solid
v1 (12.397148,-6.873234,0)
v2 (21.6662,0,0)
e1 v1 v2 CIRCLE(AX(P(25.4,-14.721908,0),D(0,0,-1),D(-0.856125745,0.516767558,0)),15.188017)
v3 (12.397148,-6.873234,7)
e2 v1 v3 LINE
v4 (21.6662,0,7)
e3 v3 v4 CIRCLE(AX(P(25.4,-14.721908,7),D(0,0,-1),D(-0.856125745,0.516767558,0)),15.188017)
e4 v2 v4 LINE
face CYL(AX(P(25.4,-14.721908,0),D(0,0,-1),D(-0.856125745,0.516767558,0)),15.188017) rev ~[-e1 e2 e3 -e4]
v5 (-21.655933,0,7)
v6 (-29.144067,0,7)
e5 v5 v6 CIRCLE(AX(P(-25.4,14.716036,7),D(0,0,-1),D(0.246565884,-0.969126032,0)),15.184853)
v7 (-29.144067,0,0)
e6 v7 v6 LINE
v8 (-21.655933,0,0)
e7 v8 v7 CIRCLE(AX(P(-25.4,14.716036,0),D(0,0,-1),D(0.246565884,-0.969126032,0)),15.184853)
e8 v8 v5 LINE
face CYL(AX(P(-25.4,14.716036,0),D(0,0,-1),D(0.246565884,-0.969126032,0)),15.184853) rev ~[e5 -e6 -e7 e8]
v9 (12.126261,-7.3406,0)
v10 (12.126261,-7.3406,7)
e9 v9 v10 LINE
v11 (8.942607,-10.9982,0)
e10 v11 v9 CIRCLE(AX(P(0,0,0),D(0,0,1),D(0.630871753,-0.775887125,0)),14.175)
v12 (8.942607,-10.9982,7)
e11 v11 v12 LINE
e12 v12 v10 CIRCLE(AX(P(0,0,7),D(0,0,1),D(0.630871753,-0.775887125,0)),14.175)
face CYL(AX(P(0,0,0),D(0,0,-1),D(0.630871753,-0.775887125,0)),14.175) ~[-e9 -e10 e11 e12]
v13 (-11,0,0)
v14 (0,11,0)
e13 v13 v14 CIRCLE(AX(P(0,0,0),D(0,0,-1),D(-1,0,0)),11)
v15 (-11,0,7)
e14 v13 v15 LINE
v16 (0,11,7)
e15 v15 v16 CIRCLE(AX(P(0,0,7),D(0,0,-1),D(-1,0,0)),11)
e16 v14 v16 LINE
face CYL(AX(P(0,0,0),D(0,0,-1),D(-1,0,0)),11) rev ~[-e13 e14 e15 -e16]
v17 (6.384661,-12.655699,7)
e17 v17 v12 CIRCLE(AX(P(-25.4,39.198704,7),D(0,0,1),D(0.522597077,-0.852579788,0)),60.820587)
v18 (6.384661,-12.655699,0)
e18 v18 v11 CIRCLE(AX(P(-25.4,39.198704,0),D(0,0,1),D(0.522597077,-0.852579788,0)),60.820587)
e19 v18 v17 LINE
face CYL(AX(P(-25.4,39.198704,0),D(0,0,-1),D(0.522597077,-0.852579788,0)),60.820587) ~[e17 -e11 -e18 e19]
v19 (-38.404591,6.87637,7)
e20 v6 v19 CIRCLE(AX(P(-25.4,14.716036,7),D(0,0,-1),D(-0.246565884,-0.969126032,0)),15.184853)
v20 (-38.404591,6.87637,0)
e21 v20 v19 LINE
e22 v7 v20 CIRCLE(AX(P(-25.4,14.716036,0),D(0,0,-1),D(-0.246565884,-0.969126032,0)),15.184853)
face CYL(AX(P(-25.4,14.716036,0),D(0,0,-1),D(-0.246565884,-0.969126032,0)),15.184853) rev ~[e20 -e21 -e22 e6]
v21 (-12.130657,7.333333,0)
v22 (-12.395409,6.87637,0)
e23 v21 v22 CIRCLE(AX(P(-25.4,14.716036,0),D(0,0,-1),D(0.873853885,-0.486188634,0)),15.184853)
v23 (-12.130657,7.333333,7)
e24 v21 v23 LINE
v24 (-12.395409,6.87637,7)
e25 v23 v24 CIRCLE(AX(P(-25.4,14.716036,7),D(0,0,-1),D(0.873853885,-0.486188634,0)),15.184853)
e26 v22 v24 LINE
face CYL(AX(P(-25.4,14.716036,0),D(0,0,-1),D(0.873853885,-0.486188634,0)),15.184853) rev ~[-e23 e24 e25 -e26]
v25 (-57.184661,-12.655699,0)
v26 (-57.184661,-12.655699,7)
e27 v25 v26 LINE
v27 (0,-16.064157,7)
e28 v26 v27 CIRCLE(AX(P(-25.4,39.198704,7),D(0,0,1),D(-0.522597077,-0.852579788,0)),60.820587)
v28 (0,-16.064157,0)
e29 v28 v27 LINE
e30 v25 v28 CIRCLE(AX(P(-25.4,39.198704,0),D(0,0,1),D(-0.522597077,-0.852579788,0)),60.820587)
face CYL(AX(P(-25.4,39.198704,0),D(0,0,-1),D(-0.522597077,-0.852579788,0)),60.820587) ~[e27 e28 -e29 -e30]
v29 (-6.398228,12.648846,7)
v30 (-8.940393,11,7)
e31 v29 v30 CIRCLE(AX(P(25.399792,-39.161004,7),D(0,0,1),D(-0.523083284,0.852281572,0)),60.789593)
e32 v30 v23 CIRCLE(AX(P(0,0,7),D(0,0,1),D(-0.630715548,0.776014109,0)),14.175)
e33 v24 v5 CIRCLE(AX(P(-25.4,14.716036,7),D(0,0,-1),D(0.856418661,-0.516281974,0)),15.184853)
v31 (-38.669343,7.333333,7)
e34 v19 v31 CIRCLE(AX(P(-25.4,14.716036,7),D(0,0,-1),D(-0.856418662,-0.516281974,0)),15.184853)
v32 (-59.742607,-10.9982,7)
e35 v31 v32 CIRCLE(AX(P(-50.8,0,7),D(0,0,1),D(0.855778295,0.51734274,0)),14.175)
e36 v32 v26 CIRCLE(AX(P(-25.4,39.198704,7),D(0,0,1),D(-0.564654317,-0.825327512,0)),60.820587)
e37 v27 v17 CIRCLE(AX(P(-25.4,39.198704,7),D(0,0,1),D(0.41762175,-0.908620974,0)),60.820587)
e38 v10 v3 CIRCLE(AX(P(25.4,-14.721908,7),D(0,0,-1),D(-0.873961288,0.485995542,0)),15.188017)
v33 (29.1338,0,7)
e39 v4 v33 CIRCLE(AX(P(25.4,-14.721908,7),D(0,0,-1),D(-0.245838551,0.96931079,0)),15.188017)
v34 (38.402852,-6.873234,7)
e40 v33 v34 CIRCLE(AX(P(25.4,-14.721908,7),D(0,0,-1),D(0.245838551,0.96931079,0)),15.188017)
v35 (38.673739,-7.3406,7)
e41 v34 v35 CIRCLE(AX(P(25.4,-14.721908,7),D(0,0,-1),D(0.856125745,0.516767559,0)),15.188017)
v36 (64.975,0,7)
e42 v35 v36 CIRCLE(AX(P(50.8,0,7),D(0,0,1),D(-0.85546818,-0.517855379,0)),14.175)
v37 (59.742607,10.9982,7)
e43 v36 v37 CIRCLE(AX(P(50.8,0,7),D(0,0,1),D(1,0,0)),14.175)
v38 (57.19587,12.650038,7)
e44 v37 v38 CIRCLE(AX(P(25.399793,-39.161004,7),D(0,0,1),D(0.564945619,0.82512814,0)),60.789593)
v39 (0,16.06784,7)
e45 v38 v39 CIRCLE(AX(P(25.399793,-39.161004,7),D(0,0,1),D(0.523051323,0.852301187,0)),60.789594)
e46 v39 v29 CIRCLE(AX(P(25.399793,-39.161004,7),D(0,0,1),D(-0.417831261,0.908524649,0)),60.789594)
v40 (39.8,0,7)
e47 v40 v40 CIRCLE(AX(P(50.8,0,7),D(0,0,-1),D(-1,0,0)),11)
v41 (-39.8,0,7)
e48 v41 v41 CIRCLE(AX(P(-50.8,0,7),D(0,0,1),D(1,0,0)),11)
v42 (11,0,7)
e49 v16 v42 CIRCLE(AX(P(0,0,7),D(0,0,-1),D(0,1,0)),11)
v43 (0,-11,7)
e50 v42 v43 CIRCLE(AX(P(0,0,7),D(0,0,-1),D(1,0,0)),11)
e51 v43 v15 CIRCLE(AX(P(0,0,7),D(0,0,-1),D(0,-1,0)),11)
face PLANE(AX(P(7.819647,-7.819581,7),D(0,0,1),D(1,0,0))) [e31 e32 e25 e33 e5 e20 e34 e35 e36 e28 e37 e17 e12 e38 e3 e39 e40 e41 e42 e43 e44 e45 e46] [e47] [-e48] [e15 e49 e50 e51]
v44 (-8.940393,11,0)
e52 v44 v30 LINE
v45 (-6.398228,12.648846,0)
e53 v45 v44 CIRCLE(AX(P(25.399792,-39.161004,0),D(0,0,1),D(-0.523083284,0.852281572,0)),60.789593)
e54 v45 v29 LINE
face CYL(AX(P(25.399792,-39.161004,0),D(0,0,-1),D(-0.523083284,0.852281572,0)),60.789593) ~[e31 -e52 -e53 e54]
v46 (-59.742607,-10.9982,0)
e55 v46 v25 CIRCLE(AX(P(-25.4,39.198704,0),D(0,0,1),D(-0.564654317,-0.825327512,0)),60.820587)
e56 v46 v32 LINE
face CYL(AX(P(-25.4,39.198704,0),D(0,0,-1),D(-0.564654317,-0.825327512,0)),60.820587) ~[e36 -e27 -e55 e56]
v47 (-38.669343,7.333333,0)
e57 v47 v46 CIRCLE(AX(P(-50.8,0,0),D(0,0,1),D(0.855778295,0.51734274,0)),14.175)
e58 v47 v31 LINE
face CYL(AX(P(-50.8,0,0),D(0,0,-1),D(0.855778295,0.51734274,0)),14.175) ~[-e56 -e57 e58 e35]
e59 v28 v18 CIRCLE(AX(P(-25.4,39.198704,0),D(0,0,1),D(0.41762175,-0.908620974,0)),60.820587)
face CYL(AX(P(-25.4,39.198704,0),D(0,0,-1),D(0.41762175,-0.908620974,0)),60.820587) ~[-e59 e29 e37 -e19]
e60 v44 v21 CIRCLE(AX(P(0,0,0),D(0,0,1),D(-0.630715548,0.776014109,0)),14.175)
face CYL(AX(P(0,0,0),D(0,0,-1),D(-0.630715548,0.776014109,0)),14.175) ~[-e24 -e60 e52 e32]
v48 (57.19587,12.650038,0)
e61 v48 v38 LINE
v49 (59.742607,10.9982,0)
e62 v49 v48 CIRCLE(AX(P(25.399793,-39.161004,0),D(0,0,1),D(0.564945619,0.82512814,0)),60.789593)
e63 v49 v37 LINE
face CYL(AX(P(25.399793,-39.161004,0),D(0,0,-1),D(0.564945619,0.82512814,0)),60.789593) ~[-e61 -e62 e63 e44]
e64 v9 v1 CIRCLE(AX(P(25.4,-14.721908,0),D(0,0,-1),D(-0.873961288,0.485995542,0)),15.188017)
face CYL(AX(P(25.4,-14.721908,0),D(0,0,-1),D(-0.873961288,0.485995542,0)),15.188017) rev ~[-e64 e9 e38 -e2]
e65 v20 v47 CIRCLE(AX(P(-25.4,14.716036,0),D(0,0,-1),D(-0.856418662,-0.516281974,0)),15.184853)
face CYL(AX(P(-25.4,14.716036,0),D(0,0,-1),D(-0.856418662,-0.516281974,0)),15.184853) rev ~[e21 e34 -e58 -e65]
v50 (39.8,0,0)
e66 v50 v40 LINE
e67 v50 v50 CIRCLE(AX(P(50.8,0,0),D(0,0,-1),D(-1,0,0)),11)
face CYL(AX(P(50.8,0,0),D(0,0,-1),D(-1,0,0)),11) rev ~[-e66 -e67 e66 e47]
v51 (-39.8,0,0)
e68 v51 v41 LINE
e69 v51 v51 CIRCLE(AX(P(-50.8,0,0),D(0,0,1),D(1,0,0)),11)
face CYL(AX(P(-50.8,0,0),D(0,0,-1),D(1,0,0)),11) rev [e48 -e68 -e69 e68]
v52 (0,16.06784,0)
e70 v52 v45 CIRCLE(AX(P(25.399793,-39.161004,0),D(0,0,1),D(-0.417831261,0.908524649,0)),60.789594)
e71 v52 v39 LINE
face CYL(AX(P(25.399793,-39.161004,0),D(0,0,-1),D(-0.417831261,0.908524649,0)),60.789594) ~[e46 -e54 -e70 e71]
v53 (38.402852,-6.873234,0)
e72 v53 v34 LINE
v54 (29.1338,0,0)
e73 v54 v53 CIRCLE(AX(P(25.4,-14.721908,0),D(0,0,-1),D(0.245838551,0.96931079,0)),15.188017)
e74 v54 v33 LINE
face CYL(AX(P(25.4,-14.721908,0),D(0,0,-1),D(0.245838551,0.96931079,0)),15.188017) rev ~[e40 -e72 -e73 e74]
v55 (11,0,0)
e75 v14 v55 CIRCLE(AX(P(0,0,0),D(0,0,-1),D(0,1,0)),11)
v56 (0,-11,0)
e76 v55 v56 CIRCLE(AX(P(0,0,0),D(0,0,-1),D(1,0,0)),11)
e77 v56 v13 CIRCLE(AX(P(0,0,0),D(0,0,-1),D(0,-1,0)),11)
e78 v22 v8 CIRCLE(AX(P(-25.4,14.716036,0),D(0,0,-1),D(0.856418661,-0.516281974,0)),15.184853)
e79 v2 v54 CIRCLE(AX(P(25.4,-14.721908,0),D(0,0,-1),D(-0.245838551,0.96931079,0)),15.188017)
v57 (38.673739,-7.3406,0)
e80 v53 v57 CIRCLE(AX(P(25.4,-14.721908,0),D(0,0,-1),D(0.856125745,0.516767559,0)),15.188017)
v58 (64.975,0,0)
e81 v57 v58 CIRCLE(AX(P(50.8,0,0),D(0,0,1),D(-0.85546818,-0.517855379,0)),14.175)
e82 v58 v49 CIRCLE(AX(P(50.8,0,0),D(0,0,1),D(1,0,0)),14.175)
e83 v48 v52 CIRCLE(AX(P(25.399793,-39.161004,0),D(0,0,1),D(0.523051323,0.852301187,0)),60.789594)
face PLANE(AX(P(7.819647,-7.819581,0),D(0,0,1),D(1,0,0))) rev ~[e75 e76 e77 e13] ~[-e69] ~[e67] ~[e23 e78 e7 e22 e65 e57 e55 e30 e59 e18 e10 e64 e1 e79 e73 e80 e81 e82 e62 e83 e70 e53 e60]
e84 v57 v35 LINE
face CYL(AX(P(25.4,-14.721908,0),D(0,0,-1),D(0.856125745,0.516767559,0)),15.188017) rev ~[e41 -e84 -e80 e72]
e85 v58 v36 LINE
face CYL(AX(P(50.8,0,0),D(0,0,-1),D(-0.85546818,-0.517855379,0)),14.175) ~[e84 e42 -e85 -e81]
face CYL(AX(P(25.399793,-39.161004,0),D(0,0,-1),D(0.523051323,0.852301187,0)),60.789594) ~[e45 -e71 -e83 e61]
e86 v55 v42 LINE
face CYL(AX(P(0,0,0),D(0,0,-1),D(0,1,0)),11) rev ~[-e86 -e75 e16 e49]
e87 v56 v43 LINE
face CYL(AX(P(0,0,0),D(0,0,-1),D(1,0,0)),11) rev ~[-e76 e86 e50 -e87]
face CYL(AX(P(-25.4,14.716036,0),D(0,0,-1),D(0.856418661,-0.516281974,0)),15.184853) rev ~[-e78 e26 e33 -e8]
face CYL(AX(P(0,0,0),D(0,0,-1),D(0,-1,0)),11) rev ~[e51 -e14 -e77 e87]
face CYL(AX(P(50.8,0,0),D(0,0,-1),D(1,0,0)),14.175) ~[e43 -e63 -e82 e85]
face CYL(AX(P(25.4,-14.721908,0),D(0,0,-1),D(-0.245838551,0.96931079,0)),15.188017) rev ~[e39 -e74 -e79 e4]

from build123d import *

# Parameters (mm, degrees)
F0_R     = 11
F1_DEPTH = 7


with BuildPart() as f1:
    # F0 (on Top) → F1 (new body)
    with BuildSketch(Plane.XY):
        with BuildLine():
            Line((14.175, 0), (11, 0))
            ThreePointArc((11, 0), (7.7781745931, -7.7781745931), (0, -11))
            Line((0, -11), (0, -14.175))
            ThreePointArc((0, -14.175), (3.2814696071, -13.7899449679), (6.3846610647, -12.655699431))
            ThreePointArc((6.3846610647, -12.655699431), (7.6740188796, -11.8429761162), (8.9426071008, -10.9982))
            ThreePointArc((8.9426071008, -10.9982), (10.6919977036, -9.3065466262), (12.1262614453, -7.3406))
            ThreePointArc((12.1262614453, -7.3406), (12.2596266851, -7.1057126256), (12.3971479741, -6.8732341084))
            ThreePointArc((12.3971479741, -6.8732341084), (13.7233413849, -3.5497219939), (14.175, 0))
        make_face()
        with BuildLine():
            ThreePointArc((0, 11), (7.7781745931, 7.7781745931), (11, 0))
            Line((11, 0), (14.175, 0))
            ThreePointArc((14.175, 0), (10.0232386233, 10.0232386233), (0, 14.175))
            Line((0, 14.175), (0, 11))
        make_face()
        with BuildLine():
            ThreePointArc((-11, 0), (-7.7781745931, 7.7781745931), (0, 11))
            Line((0, 11), (0, 14.175))
            ThreePointArc((0, 14.175), (-3.2888623779, 13.7881836824), (-6.3982276645, 12.6488461036))
            ThreePointArc((-6.3982276645, 12.6488461036), (-7.6795852422, 11.8402648338), (-8.9403928885, 11))
            ThreePointArc((-8.9403928885, 11), (-10.6938487189, 9.304419626), (-12.1306573285, 7.3333333333))
            ThreePointArc((-12.1306573285, 7.3333333333), (-12.2610462299, 7.103700791), (-12.3954086387, 6.8763703856))
            ThreePointArc((-12.3954086387, 6.8763703856), (-13.7228922326, 3.5514579785), (-14.175, 0))
            Line((-14.175, 0), (-11, 0))
        make_face()
        with BuildLine():
            Line((0, -14.175), (0, -11))
            ThreePointArc((0, -11), (-7.7781745931, -7.7781745931), (-11, 0))
            Line((-11, 0), (-14.175, 0))
            ThreePointArc((-14.175, 0), (-10.0232386233, -10.0232386233), (0, -14.175))
        make_face()
        with BuildLine():
            ThreePointArc((0, 14.175), (10.0232386233, 10.0232386233), (14.175, 0))
            Line((14.175, 0), (21.6662, 0))
            ThreePointArc((21.6662, 0), (25.4, 0.4661082384), (29.1338, 0))
            Line((29.1338, 0), (36.625, 0))
            ThreePointArc((36.625, 0), (43.3747333645, 12.0746031153), (57.1958698966, 12.650038469))
            ThreePointArc((57.1958698966, 12.650038469), (29.0258725789, 21.5203456529), (0, 16.0678398574))
            Line((0, 16.0678398574), (0, 14.175))
        make_face()
        with BuildLine():
            Line((21.6662, 0), (14.175, 0))
            ThreePointArc((14.175, 0), (13.7233413849, -3.5497219939), (12.3971479741, -6.8732341084))
            ThreePointArc((12.3971479741, -6.8732341084), (16.353496972, -2.5220464261), (21.6662, 0))
        make_face()
        with BuildLine():
            ThreePointArc((-6.3982276645, 12.6488461036), (-3.2888623779, 13.7881836824), (0, 14.175))
            Line((0, 14.175), (0, 16.0678398574))
            ThreePointArc((0, 16.0678398574), (-3.2501607804, 14.453871086), (-6.3982276645, 12.6488461036))
        make_face()
        with BuildLine():
            Line((0, -16.0641572656), (0, -14.175))
            ThreePointArc((0, -14.175), (-10.0232386233, -10.0232386233), (-14.175, 0))
            Line((-14.175, 0), (-21.6559333333, 0))
            ThreePointArc((-21.6559333333, 0), (-25.4, -0.4688166689), (-29.1440666667, 0))
            Line((-29.1440666667, 0), (-36.625, 0))
            ThreePointArc((-36.625, 0), (-43.3693858125, -12.0713130104), (-57.1846610647, -12.655699431))
            ThreePointArc((-57.1846610647, -12.655699431), (-29.0187526069, -21.5141320936), (0, -16.0641572656))
        make_face()
        with BuildLine():
            ThreePointArc((6.3846610647, -12.655699431), (3.2814696071, -13.7899449679), (0, -14.175))
            Line((0, -14.175), (0, -16.0641572656))
            ThreePointArc((0, -16.0641572656), (3.2430752796, -14.4549824836), (6.3846610647, -12.655699431))
        make_face()
        with BuildLine():
            Line((-21.6559333333, 0), (-14.175, 0))
            ThreePointArc((-14.175, 0), (-13.7228922326, 3.5514579785), (-12.3954086387, 6.8763703856))
            ThreePointArc((-12.3954086387, 6.8763703856), (-16.3473482418, 2.5246764417), (-21.6559333333, 0))
        make_face()
        with BuildLine():
            Line((36.625, 0), (29.1338, 0))
            ThreePointArc((29.1338, 0), (34.446503028, -2.5220464261), (38.4028520259, -6.8732341084))
            ThreePointArc((38.4028520259, -6.8732341084), (37.0766586151, -3.5497219939), (36.625, 0))
        make_face()
        with BuildLine():
            ThreePointArc((59.7426071008, 10.9982), (58.47955068, 11.8400181351), (57.1958698966, 12.650038469))
            ThreePointArc((57.1958698966, 12.650038469), (43.3747333645, 12.0746031153), (36.625, 0))
            ThreePointArc((36.625, 0), (37.0766586151, -3.5497219939), (38.4028520259, -6.8732341084))
            ThreePointArc((38.4028520259, -6.8732341084), (38.5403733149, -7.1057126256), (38.6737385547, -7.3406))
            ThreePointArc((38.6737385547, -7.3406), (54.6105687904, -13.6532117281), (64.975, 0))
            ThreePointArc((64.975, 0), (63.6002359481, 6.0897113784), (59.7426071008, 10.9982))
        make_face()
        with BuildLine():
            ThreePointArc((61.8, 0), (50.8, -11), (39.8, 0))
            ThreePointArc((39.8, 0), (50.8, 11), (61.8, 0))
        make_face(mode=Mode.SUBTRACT)
        with BuildLine():
            ThreePointArc((-59.7426071008, -10.9982), (-58.4740188796, -11.8429761162), (-57.1846610647, -12.655699431))
            ThreePointArc((-57.1846610647, -12.655699431), (-43.3693858125, -12.0713130104), (-36.625, 0))
            ThreePointArc((-36.625, 0), (-37.0771077674, 3.5514579785), (-38.4045913613, 6.8763703856))
            ThreePointArc((-38.4045913613, 6.8763703856), (-38.5389537701, 7.103700791), (-38.6693426715, 7.3333333333))
            ThreePointArc((-38.6693426715, 7.3333333333), (-60.1033431975, 10.6947851941), (-59.7426071008, -10.9982))
        make_face()
        with Locations((-50.8, 0)):
            Circle(F0_R, mode=Mode.SUBTRACT)
        with BuildLine():
            Line((-36.625, 0), (-29.1440666667, 0))
            ThreePointArc((-29.1440666667, 0), (-34.4526517582, 2.5246764417), (-38.4045913613, 6.8763703856))
            ThreePointArc((-38.4045913613, 6.8763703856), (-37.0771077674, 3.5514579785), (-36.625, 0))
        make_face()
    extrude(amount=F1_DEPTH)


solid = f1.part
